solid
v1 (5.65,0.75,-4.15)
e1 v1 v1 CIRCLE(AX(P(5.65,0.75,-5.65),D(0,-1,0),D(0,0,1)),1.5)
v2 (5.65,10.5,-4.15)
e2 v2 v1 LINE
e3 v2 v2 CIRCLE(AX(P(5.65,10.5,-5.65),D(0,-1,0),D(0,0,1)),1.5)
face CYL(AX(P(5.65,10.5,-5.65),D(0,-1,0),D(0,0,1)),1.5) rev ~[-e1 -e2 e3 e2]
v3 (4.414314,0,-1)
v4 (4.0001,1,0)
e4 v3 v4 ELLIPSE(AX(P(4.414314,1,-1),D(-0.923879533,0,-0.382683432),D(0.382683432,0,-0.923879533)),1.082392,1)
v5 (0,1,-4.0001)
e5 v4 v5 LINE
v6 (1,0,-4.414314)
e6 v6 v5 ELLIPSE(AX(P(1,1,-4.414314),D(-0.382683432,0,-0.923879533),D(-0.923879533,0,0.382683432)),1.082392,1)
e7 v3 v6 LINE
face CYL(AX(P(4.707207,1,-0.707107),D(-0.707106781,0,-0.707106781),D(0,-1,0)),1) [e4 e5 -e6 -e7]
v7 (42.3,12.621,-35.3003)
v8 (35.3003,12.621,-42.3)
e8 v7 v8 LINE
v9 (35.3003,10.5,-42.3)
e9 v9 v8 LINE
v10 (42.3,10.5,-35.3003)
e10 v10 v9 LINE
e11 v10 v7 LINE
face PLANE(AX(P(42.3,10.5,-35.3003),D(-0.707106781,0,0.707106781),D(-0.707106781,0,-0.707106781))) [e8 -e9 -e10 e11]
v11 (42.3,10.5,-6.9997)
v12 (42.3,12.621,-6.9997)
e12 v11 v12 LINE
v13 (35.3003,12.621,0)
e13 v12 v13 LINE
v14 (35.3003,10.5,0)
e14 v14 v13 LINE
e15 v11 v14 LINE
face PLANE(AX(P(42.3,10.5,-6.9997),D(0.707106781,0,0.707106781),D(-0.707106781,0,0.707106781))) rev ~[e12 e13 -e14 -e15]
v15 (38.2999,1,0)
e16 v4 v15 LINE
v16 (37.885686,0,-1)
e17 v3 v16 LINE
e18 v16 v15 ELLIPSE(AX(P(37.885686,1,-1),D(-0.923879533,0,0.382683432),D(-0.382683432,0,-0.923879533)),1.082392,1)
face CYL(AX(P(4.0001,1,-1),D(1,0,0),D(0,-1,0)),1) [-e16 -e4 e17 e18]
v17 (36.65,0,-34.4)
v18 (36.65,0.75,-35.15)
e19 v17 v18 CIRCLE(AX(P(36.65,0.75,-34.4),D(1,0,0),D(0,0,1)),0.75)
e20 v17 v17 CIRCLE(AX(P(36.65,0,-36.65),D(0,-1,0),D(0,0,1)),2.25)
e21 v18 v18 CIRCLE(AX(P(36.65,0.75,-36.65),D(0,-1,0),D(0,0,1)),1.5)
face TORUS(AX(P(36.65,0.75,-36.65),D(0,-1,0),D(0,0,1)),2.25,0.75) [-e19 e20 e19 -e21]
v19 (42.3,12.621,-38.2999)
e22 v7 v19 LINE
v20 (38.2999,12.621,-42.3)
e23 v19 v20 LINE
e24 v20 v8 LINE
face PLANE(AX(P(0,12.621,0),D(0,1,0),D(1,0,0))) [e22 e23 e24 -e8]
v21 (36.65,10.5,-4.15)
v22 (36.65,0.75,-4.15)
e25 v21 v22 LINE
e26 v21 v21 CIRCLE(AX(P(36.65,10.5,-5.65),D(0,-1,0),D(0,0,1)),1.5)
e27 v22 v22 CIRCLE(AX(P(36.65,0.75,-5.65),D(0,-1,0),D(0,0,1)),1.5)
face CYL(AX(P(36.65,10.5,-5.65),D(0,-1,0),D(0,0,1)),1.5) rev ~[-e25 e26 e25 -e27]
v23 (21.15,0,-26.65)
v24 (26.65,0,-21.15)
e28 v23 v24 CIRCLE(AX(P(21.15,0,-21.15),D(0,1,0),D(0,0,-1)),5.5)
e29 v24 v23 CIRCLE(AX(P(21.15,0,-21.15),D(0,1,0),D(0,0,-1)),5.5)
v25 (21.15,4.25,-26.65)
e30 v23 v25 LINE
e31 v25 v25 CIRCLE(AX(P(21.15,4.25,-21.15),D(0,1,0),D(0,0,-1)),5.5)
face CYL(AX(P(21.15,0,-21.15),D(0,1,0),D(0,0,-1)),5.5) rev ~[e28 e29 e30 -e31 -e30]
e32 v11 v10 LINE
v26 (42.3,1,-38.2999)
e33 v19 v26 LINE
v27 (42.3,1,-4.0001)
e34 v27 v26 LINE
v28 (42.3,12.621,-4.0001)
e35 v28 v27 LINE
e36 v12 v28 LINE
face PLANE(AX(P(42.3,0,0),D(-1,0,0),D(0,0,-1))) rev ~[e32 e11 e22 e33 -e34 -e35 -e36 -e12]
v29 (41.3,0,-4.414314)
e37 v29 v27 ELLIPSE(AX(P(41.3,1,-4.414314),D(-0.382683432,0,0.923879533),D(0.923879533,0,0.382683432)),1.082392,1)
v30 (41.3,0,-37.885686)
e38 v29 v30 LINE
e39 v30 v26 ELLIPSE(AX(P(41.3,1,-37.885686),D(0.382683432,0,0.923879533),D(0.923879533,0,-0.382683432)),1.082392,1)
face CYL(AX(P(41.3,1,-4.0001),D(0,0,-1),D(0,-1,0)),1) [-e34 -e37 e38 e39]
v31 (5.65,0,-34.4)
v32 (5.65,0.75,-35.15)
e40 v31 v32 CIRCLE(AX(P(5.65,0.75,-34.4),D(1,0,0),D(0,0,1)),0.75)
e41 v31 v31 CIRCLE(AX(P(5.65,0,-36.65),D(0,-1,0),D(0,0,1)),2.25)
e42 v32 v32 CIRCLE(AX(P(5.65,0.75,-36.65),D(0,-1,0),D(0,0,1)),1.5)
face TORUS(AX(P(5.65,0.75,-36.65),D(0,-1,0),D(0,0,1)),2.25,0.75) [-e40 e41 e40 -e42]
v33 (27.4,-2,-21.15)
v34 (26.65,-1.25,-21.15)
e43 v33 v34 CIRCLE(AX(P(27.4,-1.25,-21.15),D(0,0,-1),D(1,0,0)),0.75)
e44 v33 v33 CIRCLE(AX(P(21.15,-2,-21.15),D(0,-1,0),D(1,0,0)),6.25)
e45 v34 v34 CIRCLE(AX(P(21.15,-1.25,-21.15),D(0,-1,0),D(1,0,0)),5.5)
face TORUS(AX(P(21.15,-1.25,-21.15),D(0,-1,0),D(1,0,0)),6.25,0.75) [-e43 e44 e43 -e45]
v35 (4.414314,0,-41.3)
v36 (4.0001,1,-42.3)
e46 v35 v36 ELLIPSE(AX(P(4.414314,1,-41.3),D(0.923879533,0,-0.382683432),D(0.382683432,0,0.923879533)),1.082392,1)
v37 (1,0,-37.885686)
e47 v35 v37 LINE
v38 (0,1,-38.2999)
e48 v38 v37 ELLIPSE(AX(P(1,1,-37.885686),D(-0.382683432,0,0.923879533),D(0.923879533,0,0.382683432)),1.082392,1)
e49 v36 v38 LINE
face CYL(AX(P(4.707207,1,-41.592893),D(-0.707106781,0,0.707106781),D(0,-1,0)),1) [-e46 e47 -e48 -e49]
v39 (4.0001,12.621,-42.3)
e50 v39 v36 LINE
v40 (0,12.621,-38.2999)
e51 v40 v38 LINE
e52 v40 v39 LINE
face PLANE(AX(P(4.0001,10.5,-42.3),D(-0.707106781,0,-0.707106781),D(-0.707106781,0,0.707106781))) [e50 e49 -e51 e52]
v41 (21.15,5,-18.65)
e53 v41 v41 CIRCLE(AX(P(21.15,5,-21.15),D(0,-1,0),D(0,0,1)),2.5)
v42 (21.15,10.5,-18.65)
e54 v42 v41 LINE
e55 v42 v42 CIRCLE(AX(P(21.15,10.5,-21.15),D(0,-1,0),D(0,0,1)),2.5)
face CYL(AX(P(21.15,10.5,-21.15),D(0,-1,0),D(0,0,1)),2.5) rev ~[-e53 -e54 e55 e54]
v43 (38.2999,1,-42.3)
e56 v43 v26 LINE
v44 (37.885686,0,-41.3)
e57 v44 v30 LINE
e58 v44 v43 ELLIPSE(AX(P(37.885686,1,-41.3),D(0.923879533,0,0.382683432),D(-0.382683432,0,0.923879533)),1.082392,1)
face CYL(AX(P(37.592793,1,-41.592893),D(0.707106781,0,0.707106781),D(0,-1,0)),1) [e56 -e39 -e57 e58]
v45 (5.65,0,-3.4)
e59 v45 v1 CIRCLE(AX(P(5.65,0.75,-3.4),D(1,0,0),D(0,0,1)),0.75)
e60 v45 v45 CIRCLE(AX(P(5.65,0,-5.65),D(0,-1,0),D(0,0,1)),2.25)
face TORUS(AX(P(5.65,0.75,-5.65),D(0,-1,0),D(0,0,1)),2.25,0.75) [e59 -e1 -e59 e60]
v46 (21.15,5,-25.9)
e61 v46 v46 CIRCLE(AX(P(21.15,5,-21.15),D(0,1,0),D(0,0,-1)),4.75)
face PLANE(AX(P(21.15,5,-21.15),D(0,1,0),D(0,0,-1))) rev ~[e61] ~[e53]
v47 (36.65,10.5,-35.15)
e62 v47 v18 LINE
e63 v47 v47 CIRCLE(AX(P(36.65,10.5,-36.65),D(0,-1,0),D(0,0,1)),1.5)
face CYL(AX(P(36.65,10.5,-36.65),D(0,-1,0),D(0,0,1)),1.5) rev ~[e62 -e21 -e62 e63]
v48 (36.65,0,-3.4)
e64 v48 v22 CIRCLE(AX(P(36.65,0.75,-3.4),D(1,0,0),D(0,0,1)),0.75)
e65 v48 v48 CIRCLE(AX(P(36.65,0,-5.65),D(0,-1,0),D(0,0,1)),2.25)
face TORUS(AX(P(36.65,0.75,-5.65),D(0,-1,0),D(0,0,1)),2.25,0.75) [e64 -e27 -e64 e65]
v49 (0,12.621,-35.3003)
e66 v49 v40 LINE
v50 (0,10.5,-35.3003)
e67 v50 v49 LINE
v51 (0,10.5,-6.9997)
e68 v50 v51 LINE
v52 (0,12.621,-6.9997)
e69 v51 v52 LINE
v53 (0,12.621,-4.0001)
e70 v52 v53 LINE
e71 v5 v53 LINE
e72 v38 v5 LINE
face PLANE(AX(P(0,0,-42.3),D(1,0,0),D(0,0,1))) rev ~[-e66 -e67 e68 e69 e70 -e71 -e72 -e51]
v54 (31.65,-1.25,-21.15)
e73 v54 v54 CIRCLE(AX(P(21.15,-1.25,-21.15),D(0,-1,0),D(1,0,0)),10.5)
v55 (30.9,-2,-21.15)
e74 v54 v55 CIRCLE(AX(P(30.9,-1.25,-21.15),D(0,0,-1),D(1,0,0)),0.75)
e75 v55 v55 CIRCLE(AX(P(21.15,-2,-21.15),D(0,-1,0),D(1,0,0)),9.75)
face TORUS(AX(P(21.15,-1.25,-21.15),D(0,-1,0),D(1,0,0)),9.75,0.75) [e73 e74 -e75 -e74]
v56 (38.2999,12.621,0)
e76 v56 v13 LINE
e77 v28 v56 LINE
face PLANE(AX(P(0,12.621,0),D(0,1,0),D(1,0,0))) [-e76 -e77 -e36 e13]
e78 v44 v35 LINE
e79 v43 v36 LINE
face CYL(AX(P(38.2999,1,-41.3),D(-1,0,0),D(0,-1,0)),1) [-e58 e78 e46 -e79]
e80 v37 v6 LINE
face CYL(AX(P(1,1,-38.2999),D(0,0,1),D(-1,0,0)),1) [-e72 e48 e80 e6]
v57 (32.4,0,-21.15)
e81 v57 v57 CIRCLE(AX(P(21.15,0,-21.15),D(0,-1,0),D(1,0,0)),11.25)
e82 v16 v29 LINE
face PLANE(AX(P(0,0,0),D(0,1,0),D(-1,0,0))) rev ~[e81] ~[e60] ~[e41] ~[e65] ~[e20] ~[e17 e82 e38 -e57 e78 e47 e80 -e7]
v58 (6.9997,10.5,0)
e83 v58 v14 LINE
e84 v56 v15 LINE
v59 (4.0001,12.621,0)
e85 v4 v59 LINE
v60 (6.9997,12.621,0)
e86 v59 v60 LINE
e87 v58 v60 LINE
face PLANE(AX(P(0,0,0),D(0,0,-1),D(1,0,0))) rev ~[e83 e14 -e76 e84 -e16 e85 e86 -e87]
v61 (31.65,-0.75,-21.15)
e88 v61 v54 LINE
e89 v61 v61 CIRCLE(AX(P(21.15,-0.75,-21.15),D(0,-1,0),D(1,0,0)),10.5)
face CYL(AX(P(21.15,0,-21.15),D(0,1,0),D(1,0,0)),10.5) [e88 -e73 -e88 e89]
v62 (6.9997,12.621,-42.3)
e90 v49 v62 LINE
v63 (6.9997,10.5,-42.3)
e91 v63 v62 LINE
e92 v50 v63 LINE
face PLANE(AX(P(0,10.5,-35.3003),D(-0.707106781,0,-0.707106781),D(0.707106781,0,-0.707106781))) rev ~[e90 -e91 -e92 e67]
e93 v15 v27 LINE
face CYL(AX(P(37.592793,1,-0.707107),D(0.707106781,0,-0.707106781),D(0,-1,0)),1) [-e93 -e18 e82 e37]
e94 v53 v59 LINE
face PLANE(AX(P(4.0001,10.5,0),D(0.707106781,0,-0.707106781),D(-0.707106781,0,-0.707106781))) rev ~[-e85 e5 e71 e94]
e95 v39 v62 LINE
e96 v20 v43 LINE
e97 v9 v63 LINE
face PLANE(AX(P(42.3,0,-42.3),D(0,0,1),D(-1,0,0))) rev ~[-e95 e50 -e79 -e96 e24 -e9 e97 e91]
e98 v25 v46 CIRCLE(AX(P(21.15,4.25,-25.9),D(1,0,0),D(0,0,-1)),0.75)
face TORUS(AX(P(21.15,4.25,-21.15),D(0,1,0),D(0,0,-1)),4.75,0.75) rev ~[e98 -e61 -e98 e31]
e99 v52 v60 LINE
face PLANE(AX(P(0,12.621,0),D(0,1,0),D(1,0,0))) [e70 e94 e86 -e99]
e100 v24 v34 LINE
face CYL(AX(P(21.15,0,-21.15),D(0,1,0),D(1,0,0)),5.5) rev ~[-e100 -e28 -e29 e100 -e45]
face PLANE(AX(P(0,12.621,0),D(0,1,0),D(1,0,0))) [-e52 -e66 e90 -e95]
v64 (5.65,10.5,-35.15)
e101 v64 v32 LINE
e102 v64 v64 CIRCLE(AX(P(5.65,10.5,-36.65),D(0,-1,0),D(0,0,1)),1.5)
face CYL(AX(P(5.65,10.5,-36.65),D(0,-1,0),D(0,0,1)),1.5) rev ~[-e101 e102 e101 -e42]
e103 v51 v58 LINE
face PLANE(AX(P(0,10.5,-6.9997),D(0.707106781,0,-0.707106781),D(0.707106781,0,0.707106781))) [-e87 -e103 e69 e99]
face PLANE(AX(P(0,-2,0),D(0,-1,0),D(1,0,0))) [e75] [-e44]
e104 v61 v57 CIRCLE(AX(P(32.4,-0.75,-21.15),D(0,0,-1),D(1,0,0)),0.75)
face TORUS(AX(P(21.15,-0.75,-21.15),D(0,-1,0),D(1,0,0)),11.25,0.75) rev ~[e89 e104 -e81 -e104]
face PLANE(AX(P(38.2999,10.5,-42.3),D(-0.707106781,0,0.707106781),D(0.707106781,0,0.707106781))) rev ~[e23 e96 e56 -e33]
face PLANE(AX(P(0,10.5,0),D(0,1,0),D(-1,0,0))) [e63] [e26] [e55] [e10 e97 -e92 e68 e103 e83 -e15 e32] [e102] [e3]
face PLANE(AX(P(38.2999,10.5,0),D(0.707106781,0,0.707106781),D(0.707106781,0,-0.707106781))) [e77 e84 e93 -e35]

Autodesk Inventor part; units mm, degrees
ref_plane "YZ Plane" through (0, 0, 0) normal (1, 0, 0) x (0, 1, 0)
ref_plane "XZ Plane" through (0, 0, 0) normal (0, 1, 0) x (-1, 0, 0)
ref_plane "XY Plane" through (0, 0, 0) normal (0, 0, 1) x (1, 0, 0)
sketch "Sketch1" plane through (0, 0, 0) normal (0, 1, 0) x (-1, 0, 0)
  line L0 (0, 0) -> (-42.3, 0)
  line L1 (-42.3, 0) -> (-42.3, -42.3)
  line L2 (-42.3, -42.3) -> (0, -42.3)
  line L3 (0, -42.3) -> (0, 0)
  dimension "d0" = 42.3
  dimension "d1" = 42.3
extrude "Extrusion1" add sketch "Sketch1" along normal blind 10.5
sketch "Sketch2" plane through (0, 10.5, 0) normal (0, 1, 0) x (1, 0, 0)
  line L0 (4.0001, 0) -> (0, 4.0001)
  line L1 (0, 42.3) -> (0, 0) construction
  line L2 (0, 0) -> (42.3, 0) construction
  line L3 (42.3, 42.3) -> (0, 42.3) construction
  line L4 (21.15, 42.3) -> (21.15, 0) construction
  line L5 (0, 21.15) -> (42.3, 21.15) construction
  line L6 (42.3, 0) -> (42.3, 42.3) construction
  line L7 (38.2999, 0) -> (42.3, 4.0001)
  line L8 (4.0001, 42.3) -> (0, 38.2999)
  line L9 (38.2999, 42.3) -> (42.3, 38.2999)
  line L10 (0, 4.0001) -> (0, 0)
  line L11 (4.0001, 0) -> (0, 0)
  line L12 (42.3, 4.0001) -> (42.3, 0)
  line L13 (38.2999, 0) -> (42.3, 0)
  line L14 (0, 38.2999) -> (0, 42.3)
  line L15 (4.0001, 42.3) -> (0, 42.3)
  line L16 (42.3, 38.2999) -> (42.3, 42.3)
  line L17 (38.2999, 42.3) -> (42.3, 42.3)
  dimension "d4" = 5.657
  dimension "d5" = 135
extrude "Extrusion2" cut sketch "Sketch2" against normal through all
sketch "Sketch3" plane through (0, 10.5, 0) normal (0, 1, 0) x (1, 0, 0)
  line L0 (0, 38.2999) -> (0, 4.0001) construction
  line L1 (0, 6.9997) -> (6.9997, 0)
  line L2 (4.0001, 0) -> (38.2999, 0) construction
  line L3 (0, 4.0001) -> (4.0001, 0) construction
  line L4 (38.2999, 42.3) -> (4.0001, 42.3) construction
  line L5 (21.15, 42.3) -> (21.15, 0) construction
  line L6 (0, 21.15) -> (42.3, 21.15) construction
  line L7 (42.3, 4.0001) -> (42.3, 38.2999) construction
  line L8 (42.3, 6.9997) -> (35.3003, 0)
  line L9 (0, 35.3003) -> (6.9997, 42.3)
  line L10 (42.3, 35.3003) -> (35.3003, 42.3)
  line L11 (4.0001, 42.3) -> (0, 38.2999) construction
  line L12 (42.3, 38.2999) -> (38.2999, 42.3) construction
  line L13 (38.2999, 0) -> (42.3, 4.0001) construction
  line L14 (0, 35.3003) -> (0, 38.2999)
  line L15 (4.0001, 42.3) -> (6.9997, 42.3)
  line L16 (0, 38.2999) -> (4.0001, 42.3)
  line L17 (38.2999, 42.3) -> (42.3, 38.2999) construction
  line L18 (42.3, 35.3003) -> (42.3, 38.2999)
  line L19 (38.2999, 42.3) -> (35.3003, 42.3)
  line L20 (42.3, 38.2999) -> (38.2999, 42.3)
  line L21 (4.0001, 0) -> (0, 4.0001) construction
  line L22 (42.3, 4.0001) -> (38.2999, 0) construction
  line L23 (0, 6.9997) -> (0, 4.0001)
  line L24 (4.0001, 0) -> (6.9997, 0)
  line L25 (0, 4.0001) -> (4.0001, 0)
  line L26 (42.3, 6.9997) -> (42.3, 4.0001)
  line L27 (38.2999, 0) -> (42.3, 4.0001) construction
  line L28 (42.3, 4.0001) -> (38.2999, 0)
  line L29 (38.2999, 0) -> (35.3003, 0)
  point P0 (0, 0)
  dimension "d8" = 2.121
extrude "Extrusion3" add sketch "Sketch3" along normal blind 2.121
hole "Hole1" at (21.15, 10.5, -21.15) direction (0, -1, 0) diameter 5 end through all
hole "Hole2" at (5.65, 10.5, -36.65) direction (0, -1, 0) diameter 3 end through all
pattern_linear "Rectangular Pattern1" count 2 spacing 31 along (1, 0, 0) count 2 spacing 31 along (0, 0, 1) of "Hole2"
hole "Hole3" at (21.15, 0, -21.15) direction (0, 1, 0) diameter 11 depth 5
fillet "Fillet1" radius 1 8 edges at (40.2999, 0, -2.0001) (21.15, 0, 0) (2.0001, 0, -2.0001) (0, 0, -21.15) (2.0001, 0, -40.2999) (21.15, 0, -42.3) (40.2999, 0, -40.2999) (42.3, 0, -21.15)
sketch "Sketch4" plane through (0, 0, 0) normal (0, -1, 0) x (1, 0, 0)
  circle A0 centre (21.15, -21.15) radius 5.5 projected
  circle A1 centre (21.15, -21.15) radius 10.5
  point P0 (0, 0)
  dimension "d62" = 21
extrude "Extrusion4" add sketch "Sketch4" along normal blind 2
fillet "Fillet4" radius 0.75 8 edges at (10.65, 0, -21.15) (10.65, -2, -21.15) (15.65, -2, -21.15) (21.15, 5, -15.65) (5.65, 0, -38.15) (5.65, 0, -7.15) (36.65, 0, -7.15) (36.65, 0, -38.15)
thread "Thread1" size "M3x0.5" class "6H" standard "ANSI Metric M Profile" full length
thread "Thread2" size "M3x0.5" class "6H" standard "ANSI Metric M Profile" full length
thread "Thread3" size "M3x0.5" class "6H" standard "ANSI Metric M Profile" full length
thread "Thread4" size "M3x0.5" class "6H" standard "ANSI Metric M Profile" full length
properties part number "Nema 17 Top" material "Aluminum 6061"
